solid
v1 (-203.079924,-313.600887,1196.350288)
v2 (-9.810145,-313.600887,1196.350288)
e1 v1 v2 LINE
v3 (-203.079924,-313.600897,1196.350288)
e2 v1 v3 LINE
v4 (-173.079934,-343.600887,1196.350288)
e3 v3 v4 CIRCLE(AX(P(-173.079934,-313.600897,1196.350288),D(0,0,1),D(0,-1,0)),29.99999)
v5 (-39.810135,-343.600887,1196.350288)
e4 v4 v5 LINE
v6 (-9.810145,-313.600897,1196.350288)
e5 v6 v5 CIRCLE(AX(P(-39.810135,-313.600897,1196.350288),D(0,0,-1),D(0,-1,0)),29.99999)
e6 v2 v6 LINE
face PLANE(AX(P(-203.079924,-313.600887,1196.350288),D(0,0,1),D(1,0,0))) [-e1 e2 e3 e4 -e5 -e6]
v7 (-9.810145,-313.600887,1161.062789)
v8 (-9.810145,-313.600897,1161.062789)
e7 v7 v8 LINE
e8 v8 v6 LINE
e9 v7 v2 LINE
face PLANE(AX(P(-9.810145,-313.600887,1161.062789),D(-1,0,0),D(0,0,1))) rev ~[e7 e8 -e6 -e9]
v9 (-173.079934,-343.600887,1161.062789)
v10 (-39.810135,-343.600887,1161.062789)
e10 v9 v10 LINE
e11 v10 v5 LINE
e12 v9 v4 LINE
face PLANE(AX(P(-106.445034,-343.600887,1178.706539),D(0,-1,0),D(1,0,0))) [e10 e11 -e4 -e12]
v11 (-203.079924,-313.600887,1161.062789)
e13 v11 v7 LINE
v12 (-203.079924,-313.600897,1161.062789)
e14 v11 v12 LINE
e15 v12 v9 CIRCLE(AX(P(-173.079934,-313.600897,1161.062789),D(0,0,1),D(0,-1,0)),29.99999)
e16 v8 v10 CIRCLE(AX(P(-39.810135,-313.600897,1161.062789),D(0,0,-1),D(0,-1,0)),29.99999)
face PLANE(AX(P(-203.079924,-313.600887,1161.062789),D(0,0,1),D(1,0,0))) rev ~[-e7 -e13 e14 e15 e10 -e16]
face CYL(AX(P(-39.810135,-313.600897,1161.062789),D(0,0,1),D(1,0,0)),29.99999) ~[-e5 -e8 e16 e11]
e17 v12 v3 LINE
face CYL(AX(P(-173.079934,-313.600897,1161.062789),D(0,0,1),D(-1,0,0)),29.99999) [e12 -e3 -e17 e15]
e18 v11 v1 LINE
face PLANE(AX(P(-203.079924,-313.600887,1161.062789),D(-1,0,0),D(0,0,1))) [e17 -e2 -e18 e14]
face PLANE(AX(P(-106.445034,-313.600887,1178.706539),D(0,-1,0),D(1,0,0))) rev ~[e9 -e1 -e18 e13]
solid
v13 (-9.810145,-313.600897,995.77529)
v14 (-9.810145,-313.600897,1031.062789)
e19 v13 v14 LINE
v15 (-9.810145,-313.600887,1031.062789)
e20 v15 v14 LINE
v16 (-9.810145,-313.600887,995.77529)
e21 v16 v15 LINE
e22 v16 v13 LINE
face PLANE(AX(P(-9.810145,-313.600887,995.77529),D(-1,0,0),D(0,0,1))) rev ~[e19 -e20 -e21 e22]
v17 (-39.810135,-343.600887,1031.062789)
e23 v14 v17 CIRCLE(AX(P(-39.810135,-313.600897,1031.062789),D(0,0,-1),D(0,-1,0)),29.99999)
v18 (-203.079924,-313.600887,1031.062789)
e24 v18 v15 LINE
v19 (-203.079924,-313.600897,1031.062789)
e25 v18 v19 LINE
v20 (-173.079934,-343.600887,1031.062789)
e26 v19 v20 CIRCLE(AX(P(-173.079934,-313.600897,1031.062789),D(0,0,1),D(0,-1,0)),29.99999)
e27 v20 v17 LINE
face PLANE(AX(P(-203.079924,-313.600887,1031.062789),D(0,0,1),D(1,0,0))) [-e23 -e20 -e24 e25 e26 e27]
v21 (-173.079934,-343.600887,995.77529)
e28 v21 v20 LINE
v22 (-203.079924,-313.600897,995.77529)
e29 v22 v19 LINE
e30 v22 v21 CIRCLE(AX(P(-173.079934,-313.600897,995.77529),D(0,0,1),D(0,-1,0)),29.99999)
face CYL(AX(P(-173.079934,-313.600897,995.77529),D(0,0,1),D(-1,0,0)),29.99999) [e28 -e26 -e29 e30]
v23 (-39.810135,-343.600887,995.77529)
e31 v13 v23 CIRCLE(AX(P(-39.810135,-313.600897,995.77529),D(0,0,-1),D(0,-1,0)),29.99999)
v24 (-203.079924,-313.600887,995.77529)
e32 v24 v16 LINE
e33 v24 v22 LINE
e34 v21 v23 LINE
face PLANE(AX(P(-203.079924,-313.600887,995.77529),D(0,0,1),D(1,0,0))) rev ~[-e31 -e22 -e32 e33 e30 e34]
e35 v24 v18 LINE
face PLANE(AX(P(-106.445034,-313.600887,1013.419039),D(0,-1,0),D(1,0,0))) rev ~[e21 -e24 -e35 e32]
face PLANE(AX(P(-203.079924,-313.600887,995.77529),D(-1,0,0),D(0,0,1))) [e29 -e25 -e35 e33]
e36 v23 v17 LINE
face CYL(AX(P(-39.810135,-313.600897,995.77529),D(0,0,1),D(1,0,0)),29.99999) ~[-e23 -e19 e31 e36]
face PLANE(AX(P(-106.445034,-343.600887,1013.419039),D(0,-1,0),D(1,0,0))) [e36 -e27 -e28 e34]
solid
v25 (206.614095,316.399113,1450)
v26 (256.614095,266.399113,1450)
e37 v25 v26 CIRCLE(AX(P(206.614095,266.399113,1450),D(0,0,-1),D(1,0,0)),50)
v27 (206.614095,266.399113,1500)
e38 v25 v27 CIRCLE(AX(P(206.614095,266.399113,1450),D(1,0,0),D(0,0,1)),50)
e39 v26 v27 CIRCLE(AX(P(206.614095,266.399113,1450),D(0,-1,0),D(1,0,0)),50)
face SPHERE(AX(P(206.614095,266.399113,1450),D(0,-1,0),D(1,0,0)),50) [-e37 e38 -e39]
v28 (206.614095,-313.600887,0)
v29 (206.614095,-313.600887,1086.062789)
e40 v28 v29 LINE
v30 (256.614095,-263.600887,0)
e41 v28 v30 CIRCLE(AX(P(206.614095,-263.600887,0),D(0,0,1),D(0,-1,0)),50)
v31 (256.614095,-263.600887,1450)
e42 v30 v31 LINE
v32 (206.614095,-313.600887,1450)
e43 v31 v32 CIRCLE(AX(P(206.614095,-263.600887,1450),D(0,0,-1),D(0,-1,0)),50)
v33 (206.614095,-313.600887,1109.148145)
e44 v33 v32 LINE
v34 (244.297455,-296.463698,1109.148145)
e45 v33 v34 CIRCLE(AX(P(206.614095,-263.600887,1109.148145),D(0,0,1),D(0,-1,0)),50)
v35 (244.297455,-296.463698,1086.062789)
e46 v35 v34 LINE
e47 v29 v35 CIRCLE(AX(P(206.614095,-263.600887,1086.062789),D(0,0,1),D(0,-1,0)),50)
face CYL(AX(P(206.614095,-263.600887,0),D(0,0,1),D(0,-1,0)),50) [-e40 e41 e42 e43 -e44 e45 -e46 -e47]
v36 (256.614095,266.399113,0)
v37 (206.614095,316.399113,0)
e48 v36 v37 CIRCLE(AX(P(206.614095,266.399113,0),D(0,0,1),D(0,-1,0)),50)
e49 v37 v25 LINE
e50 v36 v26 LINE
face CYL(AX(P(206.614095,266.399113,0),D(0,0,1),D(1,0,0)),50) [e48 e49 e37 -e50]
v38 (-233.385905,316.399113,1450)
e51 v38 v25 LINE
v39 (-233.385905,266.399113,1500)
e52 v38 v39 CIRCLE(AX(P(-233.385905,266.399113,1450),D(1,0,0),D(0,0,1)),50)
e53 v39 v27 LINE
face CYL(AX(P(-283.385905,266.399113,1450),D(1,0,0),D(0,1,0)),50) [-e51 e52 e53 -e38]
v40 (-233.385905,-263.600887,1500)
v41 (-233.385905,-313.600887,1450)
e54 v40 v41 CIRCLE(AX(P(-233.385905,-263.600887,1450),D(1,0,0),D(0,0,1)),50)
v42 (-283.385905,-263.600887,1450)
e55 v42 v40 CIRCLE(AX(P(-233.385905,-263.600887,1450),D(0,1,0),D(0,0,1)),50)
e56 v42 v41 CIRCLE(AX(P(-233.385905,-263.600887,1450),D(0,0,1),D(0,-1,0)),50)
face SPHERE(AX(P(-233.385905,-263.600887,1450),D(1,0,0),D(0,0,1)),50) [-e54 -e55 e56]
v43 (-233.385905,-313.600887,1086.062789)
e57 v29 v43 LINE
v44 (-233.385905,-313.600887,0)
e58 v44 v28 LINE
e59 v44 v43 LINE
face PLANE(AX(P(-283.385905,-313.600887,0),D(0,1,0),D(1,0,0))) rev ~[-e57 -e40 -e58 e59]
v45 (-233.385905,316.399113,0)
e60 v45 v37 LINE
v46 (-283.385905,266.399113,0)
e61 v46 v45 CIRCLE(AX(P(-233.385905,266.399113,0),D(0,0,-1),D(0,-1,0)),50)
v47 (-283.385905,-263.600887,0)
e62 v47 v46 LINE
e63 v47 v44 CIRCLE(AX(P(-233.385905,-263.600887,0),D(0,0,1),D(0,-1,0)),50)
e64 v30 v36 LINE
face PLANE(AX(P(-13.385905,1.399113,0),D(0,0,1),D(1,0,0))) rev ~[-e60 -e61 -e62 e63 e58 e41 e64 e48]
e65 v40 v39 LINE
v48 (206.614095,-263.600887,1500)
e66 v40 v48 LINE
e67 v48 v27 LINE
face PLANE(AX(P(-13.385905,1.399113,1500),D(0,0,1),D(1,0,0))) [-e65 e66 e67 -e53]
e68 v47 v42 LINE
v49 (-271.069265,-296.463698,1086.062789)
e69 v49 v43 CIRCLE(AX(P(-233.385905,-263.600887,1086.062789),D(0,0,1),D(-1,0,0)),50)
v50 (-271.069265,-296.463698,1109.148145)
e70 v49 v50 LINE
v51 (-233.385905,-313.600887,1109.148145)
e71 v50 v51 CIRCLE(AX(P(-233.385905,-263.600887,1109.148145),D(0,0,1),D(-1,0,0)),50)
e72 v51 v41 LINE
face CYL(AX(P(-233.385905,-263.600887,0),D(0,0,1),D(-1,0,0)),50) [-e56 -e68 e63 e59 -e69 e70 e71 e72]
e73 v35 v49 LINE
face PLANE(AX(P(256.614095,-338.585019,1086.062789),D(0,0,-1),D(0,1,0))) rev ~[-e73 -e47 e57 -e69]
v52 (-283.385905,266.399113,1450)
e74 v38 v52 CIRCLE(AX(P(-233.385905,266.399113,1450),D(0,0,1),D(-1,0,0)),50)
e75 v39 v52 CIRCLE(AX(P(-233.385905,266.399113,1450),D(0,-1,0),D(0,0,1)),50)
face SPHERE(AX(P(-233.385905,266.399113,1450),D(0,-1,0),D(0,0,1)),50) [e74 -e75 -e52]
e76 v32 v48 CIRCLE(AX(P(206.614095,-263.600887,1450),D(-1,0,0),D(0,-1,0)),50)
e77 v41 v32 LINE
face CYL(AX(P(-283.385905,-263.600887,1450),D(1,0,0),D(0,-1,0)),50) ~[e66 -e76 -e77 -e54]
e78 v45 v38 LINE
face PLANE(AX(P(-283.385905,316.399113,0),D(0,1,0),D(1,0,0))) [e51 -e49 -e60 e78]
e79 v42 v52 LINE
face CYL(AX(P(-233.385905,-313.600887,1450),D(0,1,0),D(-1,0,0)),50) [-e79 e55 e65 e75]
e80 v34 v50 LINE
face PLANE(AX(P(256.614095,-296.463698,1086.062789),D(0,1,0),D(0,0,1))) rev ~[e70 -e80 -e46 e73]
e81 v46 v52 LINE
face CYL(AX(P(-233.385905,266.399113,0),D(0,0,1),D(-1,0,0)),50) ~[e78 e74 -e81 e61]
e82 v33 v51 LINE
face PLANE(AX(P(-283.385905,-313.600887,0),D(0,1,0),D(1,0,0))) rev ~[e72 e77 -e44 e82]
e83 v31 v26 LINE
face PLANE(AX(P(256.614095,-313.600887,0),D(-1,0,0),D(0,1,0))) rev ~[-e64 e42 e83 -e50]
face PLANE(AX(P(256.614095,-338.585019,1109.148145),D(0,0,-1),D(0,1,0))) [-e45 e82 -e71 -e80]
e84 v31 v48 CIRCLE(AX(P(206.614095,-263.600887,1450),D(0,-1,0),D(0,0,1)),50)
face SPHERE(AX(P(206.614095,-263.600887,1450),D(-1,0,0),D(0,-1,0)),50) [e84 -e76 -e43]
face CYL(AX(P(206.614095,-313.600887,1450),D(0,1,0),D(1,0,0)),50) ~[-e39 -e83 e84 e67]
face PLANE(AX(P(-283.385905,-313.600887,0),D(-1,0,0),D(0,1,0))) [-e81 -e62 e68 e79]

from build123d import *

# Parameters (mm, degrees)
F0_W     = 540
F0_H     = 630
F1_DEPTH = 1500
F2_R     = 50
F3_W     = 42.1213209629
F3_H     = 23.0853557587
F4_DEPTH = 1000
F5_W     = 193.2697791798
F5_H     = 35.2874994278
F6_DEPTH = 30
F7_R     = 29.99999
F7_2_R   = 29.99999


# Not quite as in the source:
# - a fillet or chamfer is up to 0.001 mm smaller than in the source, because OpenCascade refuses the exact size


with BuildPart() as f1:
    # F0 (on Top) → F1 (new body)
    with BuildSketch(Plane.XY):
        with Locations((-13.3859050655, 1.3991128653)):
            Rectangle(F0_W, F0_H)
    extrude(amount=F1_DEPTH)

    # F2
    f2_edges = [f1.edges().sort_by_distance(p)[0] for p in [
        (-13.385905, -313.600887, 1500),
        (-283.385905, 1.399113, 1500),
        (-283.385905, -313.600887, 750),
        (256.614095, -313.600887, 750),
        (256.614095, 1.399113, 1500),
        (256.614095, 316.399113, 750),
        (-13.385905, 316.399113, 1500),
        (-283.385905, 316.399113, 750),
    ]]
    fillet(f2_edges, radius=F2_R)

    # F3 (on face) → F4 (cut)
    with BuildSketch(Plane.YZ.offset(256.6140949345)):
        with Locations((-317.5243586302, 1097.6054668427)):
            Rectangle(F3_W, F3_H)
    extrude(amount=-F4_DEPTH, mode=Mode.SUBTRACT)


with BuildPart() as f6:
    # F5 (on face) → F6 (new body)
    with BuildSketch(Plane.XZ.offset(313.6008871347)):
        with Locations((-106.4450343975, 1178.7065386772)):
            Rectangle(F5_W, F5_H)
    extrude(amount=F6_DEPTH)

    # F7 (radius 30 in the source; OpenCascade refuses exactly that, so slightly less here)
    f7_edges = [f6.edges().sort_by_distance(p)[0] for p in [
        (-203.079924, -343.600887, 1178.706539),
        (-9.810145, -343.600887, 1178.706539),
    ]]
    fillet(f7_edges, radius=F7_R)


with BuildPart() as f6b:
    # F5 (on face) → F6, piece 2 (new body)
    with BuildSketch(Plane.XZ.offset(313.6008871347)):
        with Locations((-106.4450343975, 1013.4190392494)):
            Rectangle(F5_W, F5_H)
    extrude(amount=F6_DEPTH)

    # F7#2 (radius 30 in the source; OpenCascade refuses exactly that, so slightly less here)
    f7_2_edges = [f6b.edges().sort_by_distance(p)[0] for p in [
        (-203.079924, -343.600887, 1013.419039),
        (-9.810145, -343.600887, 1013.419039),
    ]]
    fillet(f7_2_edges, radius=F7_2_R)


solid = Compound([f1.part, f6.part, f6b.part])
